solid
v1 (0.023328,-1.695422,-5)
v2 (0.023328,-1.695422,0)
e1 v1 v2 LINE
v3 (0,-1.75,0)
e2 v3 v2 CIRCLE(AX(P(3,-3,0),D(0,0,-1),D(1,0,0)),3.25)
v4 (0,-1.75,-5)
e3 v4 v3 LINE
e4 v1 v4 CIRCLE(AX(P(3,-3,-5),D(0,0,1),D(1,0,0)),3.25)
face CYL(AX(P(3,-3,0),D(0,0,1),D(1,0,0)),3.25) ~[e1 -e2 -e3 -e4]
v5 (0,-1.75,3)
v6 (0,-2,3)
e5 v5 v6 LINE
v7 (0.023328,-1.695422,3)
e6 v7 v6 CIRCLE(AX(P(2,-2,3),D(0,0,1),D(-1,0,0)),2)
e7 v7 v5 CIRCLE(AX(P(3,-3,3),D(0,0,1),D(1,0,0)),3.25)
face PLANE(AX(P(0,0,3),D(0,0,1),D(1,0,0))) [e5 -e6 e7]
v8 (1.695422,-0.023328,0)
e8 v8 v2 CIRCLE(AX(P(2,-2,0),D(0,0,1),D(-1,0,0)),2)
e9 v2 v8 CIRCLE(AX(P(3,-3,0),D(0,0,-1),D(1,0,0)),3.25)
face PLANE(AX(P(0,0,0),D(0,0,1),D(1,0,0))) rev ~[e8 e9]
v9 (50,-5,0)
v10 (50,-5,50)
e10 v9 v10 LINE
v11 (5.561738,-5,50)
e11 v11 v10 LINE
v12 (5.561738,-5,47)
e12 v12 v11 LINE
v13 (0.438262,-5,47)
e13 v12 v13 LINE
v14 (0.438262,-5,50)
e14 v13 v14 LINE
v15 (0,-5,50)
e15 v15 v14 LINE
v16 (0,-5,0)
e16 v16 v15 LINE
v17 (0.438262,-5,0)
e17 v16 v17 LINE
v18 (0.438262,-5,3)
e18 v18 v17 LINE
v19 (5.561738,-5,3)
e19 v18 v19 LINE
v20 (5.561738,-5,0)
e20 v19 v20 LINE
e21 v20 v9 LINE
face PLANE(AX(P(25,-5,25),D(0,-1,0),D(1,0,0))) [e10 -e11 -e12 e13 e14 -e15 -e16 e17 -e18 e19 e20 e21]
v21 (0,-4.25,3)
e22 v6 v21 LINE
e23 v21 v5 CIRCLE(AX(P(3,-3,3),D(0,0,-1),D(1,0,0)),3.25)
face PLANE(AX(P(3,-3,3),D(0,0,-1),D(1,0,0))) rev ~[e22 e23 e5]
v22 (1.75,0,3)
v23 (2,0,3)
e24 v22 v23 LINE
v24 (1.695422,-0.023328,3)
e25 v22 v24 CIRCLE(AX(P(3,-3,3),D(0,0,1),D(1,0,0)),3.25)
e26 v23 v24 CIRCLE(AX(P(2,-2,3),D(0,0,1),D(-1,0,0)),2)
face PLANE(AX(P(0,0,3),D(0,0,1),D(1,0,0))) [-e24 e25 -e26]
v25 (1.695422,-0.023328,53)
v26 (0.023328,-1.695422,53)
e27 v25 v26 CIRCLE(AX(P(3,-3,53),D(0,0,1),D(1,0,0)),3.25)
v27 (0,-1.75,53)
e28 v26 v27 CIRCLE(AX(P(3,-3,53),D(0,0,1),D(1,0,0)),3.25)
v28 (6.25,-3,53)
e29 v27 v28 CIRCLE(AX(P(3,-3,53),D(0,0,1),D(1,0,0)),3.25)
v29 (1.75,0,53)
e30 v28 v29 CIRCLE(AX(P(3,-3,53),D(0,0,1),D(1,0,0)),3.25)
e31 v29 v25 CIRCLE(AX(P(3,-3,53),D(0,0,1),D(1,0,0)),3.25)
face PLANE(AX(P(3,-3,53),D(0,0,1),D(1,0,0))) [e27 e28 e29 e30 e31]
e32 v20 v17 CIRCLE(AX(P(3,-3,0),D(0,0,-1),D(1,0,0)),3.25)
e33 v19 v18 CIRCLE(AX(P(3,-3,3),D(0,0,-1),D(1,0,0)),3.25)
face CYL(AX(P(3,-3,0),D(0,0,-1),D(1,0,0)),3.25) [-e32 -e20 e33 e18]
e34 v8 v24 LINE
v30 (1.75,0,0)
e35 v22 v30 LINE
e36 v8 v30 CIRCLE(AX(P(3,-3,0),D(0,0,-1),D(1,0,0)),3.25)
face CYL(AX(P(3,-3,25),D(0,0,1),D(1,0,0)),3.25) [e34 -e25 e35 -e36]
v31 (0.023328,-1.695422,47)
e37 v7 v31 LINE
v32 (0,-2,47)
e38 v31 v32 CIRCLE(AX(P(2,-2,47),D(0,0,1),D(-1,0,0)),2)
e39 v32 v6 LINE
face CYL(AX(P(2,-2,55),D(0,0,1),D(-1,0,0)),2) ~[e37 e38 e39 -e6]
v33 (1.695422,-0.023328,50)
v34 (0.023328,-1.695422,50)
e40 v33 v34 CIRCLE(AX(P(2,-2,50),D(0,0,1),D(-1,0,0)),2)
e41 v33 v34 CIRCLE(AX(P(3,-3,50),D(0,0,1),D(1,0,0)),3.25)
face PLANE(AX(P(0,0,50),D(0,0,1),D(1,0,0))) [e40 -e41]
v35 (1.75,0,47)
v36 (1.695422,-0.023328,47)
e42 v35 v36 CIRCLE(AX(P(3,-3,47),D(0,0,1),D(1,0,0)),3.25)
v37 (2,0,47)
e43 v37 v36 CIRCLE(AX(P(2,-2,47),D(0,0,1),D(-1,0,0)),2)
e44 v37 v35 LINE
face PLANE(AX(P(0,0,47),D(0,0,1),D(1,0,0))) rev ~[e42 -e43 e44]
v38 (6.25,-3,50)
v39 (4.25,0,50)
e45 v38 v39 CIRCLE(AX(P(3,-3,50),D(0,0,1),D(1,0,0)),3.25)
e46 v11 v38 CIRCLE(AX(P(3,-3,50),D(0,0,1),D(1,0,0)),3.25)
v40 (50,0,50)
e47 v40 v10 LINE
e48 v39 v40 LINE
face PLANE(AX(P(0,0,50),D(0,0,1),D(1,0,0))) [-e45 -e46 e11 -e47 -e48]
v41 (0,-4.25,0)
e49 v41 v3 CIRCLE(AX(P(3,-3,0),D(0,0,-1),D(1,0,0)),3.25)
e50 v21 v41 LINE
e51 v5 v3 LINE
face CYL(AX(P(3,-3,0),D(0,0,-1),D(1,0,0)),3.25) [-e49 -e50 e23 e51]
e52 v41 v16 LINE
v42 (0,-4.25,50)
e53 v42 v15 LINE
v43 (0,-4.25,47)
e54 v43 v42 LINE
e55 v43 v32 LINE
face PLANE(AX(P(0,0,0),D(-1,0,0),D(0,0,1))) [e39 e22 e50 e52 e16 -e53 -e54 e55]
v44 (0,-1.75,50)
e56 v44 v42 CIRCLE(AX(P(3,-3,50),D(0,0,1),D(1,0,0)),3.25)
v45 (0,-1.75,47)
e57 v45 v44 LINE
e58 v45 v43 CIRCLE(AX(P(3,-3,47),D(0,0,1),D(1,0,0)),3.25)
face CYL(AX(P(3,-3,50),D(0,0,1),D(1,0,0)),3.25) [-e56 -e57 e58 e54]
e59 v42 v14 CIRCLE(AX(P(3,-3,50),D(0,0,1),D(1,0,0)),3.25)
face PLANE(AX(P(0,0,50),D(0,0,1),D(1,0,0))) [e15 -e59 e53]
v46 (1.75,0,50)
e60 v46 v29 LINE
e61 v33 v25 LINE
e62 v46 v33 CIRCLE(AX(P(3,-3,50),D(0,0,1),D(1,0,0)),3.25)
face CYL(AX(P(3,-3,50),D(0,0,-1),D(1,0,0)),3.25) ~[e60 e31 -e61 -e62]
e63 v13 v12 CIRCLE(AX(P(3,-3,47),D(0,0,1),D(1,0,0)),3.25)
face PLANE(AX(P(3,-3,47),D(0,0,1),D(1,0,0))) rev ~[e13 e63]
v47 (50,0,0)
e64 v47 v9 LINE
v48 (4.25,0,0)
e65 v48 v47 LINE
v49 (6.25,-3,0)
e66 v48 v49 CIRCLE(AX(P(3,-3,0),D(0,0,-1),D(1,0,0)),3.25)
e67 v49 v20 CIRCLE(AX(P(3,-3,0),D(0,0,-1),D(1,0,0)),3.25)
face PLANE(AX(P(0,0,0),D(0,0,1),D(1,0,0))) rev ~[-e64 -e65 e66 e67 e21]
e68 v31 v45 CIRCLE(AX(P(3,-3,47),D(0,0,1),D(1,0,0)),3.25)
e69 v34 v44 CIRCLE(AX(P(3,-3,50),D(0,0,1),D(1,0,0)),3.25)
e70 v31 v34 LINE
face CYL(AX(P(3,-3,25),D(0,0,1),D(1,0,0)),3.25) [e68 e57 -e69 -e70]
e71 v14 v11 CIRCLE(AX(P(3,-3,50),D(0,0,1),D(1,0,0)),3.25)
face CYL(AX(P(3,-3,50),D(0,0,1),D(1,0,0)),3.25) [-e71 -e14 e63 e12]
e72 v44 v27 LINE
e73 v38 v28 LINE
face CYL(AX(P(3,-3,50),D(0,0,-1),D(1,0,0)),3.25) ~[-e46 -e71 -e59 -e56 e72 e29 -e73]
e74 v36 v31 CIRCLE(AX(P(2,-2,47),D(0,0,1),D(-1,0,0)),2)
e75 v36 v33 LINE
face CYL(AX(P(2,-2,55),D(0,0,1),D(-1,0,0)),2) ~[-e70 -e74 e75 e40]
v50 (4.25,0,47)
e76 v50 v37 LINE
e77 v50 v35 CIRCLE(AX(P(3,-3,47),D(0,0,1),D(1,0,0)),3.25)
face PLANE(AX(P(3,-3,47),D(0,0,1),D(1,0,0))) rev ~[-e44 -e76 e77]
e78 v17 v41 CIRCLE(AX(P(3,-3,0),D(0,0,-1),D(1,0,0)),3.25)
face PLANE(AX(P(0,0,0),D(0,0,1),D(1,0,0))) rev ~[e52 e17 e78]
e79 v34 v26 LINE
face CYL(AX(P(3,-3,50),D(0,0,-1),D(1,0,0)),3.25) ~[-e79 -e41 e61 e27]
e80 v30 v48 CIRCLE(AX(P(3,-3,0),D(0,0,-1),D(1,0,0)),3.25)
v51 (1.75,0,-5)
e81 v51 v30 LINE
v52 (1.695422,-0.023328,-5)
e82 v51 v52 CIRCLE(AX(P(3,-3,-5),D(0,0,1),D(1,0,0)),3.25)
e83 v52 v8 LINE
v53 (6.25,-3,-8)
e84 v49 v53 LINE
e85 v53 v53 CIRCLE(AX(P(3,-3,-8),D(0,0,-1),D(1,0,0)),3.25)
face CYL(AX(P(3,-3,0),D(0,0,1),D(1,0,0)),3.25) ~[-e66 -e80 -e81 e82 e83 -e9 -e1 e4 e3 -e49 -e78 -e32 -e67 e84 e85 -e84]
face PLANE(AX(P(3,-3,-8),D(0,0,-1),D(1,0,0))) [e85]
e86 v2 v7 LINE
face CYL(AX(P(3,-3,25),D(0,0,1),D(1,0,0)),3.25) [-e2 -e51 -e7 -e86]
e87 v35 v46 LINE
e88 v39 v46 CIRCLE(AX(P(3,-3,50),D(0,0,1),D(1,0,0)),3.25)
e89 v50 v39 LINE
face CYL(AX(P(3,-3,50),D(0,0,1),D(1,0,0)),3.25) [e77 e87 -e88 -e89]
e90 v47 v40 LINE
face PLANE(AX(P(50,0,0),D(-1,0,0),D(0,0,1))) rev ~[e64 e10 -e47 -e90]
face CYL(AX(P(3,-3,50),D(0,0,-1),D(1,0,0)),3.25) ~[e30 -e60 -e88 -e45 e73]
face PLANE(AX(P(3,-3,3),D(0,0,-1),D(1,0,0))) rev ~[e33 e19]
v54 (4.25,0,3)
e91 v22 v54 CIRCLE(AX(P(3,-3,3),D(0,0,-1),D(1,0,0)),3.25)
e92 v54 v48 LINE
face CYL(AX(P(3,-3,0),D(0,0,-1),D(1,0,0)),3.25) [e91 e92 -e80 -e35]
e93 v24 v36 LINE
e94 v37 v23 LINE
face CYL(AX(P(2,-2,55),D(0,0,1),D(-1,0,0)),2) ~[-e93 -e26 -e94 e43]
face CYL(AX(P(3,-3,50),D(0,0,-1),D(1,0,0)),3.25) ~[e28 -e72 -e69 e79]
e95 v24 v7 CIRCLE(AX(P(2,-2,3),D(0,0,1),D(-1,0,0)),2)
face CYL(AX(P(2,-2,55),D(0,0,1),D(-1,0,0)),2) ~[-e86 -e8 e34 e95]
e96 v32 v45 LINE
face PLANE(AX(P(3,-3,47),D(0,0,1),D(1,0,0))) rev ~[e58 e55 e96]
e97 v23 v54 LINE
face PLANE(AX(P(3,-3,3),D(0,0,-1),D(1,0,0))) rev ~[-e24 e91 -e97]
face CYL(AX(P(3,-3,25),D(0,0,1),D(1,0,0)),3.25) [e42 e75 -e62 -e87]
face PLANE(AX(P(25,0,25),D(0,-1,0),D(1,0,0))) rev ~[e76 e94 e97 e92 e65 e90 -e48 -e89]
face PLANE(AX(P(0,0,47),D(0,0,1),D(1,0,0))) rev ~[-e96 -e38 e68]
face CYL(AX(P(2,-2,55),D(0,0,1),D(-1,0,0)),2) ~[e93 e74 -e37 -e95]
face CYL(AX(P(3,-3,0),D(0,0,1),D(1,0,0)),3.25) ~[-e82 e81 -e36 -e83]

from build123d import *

# Parameters (mm, degrees)
F0_W          = 50
F0_H          = 50
F1_DEPTH      = 5
F2_R          = 3.25
F3_DEPTH      = 8
F3_DEPTH_BACK = 3
F4_R          = 3.25
F5_DEPTH      = 3
F5_DEPTH_BACK = 3
F6_T4_DEPTH   = 60
F6_S5_R       = 3.25
F6_T6_DEPTH   = 32
F6_T10_DEPTH  = 60


# Not quite as in the source:
# - a fillet or chamfer that OpenCascade refuses, or shapes differently, is made with other operations: its cross-section is extruded or revolved along the edge and cut away or added


with BuildPart() as f1:
    # F0 (on Front) → F1 (new body)
    with BuildSketch(Plane.XZ):
        with Locations((25, 25)):
            Rectangle(F0_W, F0_H)
    extrude(amount=F1_DEPTH)

    # F2 (on face) → F3 (join, two sides)
    with BuildSketch(Plane(origin=(0, 0, 0), x_dir=(1, 0, 0), z_dir=(0, 0, -1))) as f3_sk:
        with Locations((3, 3)):
            Circle(F2_R)
    extrude(amount=F3_DEPTH)
    extrude(f3_sk.sketch, amount=-F3_DEPTH_BACK)

    # F4 (on face) → F5 (join, two sides)
    with BuildSketch(Plane.XY.offset(50)) as f5_sk:
        with Locations((3, -3)):
            Circle(F4_R)
    extrude(amount=F5_DEPTH)
    extrude(f5_sk.sketch, amount=-F5_DEPTH_BACK)

    # F6: fillet of radius 2 on 1 edges, made by hand


with BuildPart() as f6_tool2:
    # F6_s3 → F6_t4 (new body)
    with BuildSketch(Plane.XY.offset(55)):
        with BuildLine():
            ThreePointArc((0, -2), (0.5857864376, -0.5857864376), (2, 0))
            Line((2, 0), (0, 0))
            Line((0, 0), (0, -2))
        make_face()
    extrude(amount=-F6_T4_DEPTH)

    # F6_s5 → F6_t6 (cut, symmetric)
    with BuildSketch(Plane.XY.offset(25)):
        with Locations((3, -3)):
            Circle(F6_S5_R)
    extrude(amount=F6_T6_DEPTH, both=True, mode=Mode.SUBTRACT)


with BuildPart() as f1_1:
    add(f1.part)

    # F6_t1: cut F6_tool2
    add(f6_tool2.part, mode=Mode.SUBTRACT)


with BuildPart() as f6_tool8:
    # F6_s9 → F6_t10 (new body)
    with BuildSketch(Plane.XY.offset(55)):
        with BuildLine():
            ThreePointArc((0, -2), (0.5857864376, -0.5857864376), (2, 0))
            Line((2, 0), (0, 0))
            Line((0, 0), (0, -2))
        make_face()
    extrude(amount=-F6_T10_DEPTH)

    split(bisect_by=Plane.XY.offset(3), keep=Keep.TOP)

    split(bisect_by=Plane.XY.offset(47), keep=Keep.BOTTOM)


with BuildPart() as f1_2:
    add(f1_1.part)

    # F6_t7: cut F6_tool8
    add(f6_tool8.part, mode=Mode.SUBTRACT)


solid = f1_2.part
